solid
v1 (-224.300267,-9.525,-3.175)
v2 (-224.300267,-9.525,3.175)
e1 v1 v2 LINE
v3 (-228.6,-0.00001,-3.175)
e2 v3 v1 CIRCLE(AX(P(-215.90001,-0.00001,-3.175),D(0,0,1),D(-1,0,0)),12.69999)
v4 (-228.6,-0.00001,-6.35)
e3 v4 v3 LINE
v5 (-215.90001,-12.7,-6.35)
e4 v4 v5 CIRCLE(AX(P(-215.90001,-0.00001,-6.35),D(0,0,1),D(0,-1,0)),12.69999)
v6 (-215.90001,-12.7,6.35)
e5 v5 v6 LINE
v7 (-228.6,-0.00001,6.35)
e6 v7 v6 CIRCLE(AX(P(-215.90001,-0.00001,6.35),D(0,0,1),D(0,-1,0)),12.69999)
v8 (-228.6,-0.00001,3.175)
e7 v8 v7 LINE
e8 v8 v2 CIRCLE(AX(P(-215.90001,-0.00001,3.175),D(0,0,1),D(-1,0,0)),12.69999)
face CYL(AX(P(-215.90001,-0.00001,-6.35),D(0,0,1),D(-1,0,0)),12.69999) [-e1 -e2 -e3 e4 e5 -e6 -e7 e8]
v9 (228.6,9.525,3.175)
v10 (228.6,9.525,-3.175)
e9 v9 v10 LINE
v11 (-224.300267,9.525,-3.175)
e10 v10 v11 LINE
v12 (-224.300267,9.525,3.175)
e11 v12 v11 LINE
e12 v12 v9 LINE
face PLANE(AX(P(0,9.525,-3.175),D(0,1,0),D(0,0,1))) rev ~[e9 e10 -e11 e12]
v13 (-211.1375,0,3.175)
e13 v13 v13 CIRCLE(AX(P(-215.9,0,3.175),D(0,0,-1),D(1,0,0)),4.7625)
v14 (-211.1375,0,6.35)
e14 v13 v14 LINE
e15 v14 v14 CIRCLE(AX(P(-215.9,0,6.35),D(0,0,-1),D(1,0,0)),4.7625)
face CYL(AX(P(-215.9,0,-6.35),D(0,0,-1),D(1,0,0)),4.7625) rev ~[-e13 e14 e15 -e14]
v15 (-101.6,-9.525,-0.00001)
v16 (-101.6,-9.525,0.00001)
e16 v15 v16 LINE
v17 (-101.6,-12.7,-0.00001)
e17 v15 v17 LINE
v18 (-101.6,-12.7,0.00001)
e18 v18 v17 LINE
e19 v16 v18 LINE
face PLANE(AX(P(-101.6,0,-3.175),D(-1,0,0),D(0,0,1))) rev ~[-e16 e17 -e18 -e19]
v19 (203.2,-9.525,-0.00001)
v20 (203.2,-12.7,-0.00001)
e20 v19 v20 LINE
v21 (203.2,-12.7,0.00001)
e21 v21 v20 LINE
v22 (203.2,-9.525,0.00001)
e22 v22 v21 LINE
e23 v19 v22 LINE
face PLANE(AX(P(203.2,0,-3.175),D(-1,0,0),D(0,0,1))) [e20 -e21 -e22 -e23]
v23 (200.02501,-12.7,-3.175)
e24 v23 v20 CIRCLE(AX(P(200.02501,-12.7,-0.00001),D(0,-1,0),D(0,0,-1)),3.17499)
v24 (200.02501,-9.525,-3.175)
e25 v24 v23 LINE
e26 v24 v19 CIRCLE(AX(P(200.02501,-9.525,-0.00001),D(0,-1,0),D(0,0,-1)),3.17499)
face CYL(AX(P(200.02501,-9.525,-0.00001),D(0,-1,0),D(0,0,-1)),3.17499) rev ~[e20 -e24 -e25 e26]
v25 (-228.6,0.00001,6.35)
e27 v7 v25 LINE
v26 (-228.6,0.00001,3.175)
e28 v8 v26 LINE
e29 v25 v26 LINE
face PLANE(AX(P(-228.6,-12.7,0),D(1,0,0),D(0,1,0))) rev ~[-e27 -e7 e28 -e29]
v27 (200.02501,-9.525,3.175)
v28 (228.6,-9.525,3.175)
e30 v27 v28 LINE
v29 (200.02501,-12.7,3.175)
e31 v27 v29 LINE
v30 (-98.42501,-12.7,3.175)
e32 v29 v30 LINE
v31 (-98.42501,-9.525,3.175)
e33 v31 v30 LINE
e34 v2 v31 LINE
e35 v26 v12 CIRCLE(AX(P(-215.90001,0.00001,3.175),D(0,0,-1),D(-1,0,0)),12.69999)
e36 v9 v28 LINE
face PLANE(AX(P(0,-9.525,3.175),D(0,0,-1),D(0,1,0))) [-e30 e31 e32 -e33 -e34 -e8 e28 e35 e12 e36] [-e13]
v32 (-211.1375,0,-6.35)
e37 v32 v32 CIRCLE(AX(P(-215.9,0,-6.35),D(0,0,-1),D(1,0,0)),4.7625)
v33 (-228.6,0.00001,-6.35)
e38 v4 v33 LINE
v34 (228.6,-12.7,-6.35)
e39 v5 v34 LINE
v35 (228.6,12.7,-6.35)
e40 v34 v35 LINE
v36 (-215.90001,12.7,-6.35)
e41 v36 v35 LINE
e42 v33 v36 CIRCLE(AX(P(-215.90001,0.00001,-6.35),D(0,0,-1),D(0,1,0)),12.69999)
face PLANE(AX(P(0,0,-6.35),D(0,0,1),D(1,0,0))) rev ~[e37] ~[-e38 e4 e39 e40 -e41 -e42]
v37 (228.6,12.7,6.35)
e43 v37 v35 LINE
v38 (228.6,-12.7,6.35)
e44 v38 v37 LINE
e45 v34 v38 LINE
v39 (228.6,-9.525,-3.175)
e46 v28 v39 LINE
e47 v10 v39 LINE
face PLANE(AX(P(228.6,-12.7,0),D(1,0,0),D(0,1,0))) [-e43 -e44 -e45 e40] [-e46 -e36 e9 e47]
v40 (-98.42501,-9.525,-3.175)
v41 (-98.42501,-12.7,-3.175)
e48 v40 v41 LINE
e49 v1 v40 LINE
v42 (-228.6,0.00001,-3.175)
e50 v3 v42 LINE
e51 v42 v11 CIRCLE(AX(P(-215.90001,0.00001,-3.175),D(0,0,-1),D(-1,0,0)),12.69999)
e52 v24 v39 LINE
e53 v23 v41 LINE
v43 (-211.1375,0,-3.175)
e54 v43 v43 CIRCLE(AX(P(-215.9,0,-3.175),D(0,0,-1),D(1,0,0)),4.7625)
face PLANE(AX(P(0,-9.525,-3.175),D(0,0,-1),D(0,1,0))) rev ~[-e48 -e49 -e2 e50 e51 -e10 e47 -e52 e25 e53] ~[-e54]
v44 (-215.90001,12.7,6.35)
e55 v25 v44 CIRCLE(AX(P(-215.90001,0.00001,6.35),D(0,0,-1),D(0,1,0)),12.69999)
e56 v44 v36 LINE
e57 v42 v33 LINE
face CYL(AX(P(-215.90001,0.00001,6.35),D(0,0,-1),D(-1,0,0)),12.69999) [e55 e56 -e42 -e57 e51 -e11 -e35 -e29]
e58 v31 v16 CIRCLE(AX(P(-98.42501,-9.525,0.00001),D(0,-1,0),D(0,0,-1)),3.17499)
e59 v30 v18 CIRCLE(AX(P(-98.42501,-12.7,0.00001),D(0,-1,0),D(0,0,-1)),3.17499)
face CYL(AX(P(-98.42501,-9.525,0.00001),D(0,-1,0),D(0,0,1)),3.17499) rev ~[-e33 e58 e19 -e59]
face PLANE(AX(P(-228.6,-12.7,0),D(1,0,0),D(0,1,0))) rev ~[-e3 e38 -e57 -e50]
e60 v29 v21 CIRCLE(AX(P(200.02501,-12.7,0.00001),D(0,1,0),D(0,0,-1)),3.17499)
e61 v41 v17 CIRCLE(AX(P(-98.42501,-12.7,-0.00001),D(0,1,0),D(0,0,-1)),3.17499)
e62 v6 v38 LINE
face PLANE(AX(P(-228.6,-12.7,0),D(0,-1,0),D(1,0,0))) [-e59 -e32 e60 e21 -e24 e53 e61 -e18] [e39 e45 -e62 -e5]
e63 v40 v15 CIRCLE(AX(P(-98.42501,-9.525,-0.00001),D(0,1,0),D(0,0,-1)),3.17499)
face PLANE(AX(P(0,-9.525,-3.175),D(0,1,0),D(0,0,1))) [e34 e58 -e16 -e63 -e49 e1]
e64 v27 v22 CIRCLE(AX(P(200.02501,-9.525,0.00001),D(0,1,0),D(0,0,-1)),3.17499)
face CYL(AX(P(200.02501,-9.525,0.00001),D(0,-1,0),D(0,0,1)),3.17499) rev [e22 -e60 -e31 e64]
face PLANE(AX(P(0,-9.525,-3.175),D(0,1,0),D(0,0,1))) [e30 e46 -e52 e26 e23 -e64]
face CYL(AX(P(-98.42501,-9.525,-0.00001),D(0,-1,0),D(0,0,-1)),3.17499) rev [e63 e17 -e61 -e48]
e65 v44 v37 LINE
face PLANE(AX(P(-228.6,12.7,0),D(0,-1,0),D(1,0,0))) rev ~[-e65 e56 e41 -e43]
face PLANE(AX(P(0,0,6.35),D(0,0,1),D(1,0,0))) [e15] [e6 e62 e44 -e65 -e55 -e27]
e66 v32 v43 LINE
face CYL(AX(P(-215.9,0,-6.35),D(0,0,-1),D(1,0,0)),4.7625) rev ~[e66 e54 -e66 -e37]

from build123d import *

# Parameters (mm, degrees)
F0_W          = 457.2
F0_H          = 25.4
F1_DEPTH      = 6.35
F2_R          = 12.69999
F3_R          = 4.7625
F4_DEPTH      = 12.701
F5_W          = 19.05
F5_H          = 6.35
F6_DEPTH      = 228.601
F6_DEPTH_BACK = 228.601
F7_W          = 304.8
F7_H          = 6.35
F8_DEPTH      = 12.701
F9_R          = 3.17499


# Not quite as in the source:
# - a fillet or chamfer is up to 0.001 mm smaller than in the source, because OpenCascade refuses the exact size


with BuildPart() as f1:
    # F0 (on Top) → F1 (new body, symmetric)
    with BuildSketch(Plane.XY):
        Rectangle(F0_W, F0_H)
    extrude(amount=F1_DEPTH, both=True)

    # F2 (radius 12.7 in the source; OpenCascade refuses exactly that, so slightly less here)
    f2_edges = [f1.edges().sort_by_distance(p)[0] for p in [
        (-228.6, 12.7, 0),
        (-228.6, -12.7, 0),
    ]]
    fillet(f2_edges, radius=F2_R)

    # F3 (on face) → F4 (cut, through all)
    with BuildSketch(Plane(origin=(0, 0, -6.35), x_dir=(1, 0, 0), z_dir=(0, 0, -1))):
        with Locations((-215.9, 0)):
            Circle(F3_R)
    extrude(amount=-F4_DEPTH, mode=Mode.SUBTRACT)

    # F5 (on Right) → F6 (cut, two sides)
    with BuildSketch(Plane.YZ) as f6_sk:
        Rectangle(F5_W, F5_H)
    extrude(amount=-F6_DEPTH, mode=Mode.SUBTRACT)
    extrude(f6_sk.sketch, amount=F6_DEPTH_BACK, mode=Mode.SUBTRACT)

    # F7 (on Front) → F8 (cut, through all)
    with BuildSketch(Plane.XZ):
        with Locations((50.8, 0)):
            Rectangle(F7_W, F7_H)
    extrude(amount=F8_DEPTH, mode=Mode.SUBTRACT)

    # F9 (radius 3.175 in the source; OpenCascade refuses exactly that, so slightly less here)
    f9_edges = [f1.edges().sort_by_distance(p)[0] for p in [
        (-101.6, -11.1125, 3.175),
        (203.2, -11.1125, -3.175),
        (203.2, -11.1125, 3.175),
        (-101.6, -11.1125, -3.175),
    ]]
    fillet(f9_edges, radius=F9_R)


solid = f1.part
